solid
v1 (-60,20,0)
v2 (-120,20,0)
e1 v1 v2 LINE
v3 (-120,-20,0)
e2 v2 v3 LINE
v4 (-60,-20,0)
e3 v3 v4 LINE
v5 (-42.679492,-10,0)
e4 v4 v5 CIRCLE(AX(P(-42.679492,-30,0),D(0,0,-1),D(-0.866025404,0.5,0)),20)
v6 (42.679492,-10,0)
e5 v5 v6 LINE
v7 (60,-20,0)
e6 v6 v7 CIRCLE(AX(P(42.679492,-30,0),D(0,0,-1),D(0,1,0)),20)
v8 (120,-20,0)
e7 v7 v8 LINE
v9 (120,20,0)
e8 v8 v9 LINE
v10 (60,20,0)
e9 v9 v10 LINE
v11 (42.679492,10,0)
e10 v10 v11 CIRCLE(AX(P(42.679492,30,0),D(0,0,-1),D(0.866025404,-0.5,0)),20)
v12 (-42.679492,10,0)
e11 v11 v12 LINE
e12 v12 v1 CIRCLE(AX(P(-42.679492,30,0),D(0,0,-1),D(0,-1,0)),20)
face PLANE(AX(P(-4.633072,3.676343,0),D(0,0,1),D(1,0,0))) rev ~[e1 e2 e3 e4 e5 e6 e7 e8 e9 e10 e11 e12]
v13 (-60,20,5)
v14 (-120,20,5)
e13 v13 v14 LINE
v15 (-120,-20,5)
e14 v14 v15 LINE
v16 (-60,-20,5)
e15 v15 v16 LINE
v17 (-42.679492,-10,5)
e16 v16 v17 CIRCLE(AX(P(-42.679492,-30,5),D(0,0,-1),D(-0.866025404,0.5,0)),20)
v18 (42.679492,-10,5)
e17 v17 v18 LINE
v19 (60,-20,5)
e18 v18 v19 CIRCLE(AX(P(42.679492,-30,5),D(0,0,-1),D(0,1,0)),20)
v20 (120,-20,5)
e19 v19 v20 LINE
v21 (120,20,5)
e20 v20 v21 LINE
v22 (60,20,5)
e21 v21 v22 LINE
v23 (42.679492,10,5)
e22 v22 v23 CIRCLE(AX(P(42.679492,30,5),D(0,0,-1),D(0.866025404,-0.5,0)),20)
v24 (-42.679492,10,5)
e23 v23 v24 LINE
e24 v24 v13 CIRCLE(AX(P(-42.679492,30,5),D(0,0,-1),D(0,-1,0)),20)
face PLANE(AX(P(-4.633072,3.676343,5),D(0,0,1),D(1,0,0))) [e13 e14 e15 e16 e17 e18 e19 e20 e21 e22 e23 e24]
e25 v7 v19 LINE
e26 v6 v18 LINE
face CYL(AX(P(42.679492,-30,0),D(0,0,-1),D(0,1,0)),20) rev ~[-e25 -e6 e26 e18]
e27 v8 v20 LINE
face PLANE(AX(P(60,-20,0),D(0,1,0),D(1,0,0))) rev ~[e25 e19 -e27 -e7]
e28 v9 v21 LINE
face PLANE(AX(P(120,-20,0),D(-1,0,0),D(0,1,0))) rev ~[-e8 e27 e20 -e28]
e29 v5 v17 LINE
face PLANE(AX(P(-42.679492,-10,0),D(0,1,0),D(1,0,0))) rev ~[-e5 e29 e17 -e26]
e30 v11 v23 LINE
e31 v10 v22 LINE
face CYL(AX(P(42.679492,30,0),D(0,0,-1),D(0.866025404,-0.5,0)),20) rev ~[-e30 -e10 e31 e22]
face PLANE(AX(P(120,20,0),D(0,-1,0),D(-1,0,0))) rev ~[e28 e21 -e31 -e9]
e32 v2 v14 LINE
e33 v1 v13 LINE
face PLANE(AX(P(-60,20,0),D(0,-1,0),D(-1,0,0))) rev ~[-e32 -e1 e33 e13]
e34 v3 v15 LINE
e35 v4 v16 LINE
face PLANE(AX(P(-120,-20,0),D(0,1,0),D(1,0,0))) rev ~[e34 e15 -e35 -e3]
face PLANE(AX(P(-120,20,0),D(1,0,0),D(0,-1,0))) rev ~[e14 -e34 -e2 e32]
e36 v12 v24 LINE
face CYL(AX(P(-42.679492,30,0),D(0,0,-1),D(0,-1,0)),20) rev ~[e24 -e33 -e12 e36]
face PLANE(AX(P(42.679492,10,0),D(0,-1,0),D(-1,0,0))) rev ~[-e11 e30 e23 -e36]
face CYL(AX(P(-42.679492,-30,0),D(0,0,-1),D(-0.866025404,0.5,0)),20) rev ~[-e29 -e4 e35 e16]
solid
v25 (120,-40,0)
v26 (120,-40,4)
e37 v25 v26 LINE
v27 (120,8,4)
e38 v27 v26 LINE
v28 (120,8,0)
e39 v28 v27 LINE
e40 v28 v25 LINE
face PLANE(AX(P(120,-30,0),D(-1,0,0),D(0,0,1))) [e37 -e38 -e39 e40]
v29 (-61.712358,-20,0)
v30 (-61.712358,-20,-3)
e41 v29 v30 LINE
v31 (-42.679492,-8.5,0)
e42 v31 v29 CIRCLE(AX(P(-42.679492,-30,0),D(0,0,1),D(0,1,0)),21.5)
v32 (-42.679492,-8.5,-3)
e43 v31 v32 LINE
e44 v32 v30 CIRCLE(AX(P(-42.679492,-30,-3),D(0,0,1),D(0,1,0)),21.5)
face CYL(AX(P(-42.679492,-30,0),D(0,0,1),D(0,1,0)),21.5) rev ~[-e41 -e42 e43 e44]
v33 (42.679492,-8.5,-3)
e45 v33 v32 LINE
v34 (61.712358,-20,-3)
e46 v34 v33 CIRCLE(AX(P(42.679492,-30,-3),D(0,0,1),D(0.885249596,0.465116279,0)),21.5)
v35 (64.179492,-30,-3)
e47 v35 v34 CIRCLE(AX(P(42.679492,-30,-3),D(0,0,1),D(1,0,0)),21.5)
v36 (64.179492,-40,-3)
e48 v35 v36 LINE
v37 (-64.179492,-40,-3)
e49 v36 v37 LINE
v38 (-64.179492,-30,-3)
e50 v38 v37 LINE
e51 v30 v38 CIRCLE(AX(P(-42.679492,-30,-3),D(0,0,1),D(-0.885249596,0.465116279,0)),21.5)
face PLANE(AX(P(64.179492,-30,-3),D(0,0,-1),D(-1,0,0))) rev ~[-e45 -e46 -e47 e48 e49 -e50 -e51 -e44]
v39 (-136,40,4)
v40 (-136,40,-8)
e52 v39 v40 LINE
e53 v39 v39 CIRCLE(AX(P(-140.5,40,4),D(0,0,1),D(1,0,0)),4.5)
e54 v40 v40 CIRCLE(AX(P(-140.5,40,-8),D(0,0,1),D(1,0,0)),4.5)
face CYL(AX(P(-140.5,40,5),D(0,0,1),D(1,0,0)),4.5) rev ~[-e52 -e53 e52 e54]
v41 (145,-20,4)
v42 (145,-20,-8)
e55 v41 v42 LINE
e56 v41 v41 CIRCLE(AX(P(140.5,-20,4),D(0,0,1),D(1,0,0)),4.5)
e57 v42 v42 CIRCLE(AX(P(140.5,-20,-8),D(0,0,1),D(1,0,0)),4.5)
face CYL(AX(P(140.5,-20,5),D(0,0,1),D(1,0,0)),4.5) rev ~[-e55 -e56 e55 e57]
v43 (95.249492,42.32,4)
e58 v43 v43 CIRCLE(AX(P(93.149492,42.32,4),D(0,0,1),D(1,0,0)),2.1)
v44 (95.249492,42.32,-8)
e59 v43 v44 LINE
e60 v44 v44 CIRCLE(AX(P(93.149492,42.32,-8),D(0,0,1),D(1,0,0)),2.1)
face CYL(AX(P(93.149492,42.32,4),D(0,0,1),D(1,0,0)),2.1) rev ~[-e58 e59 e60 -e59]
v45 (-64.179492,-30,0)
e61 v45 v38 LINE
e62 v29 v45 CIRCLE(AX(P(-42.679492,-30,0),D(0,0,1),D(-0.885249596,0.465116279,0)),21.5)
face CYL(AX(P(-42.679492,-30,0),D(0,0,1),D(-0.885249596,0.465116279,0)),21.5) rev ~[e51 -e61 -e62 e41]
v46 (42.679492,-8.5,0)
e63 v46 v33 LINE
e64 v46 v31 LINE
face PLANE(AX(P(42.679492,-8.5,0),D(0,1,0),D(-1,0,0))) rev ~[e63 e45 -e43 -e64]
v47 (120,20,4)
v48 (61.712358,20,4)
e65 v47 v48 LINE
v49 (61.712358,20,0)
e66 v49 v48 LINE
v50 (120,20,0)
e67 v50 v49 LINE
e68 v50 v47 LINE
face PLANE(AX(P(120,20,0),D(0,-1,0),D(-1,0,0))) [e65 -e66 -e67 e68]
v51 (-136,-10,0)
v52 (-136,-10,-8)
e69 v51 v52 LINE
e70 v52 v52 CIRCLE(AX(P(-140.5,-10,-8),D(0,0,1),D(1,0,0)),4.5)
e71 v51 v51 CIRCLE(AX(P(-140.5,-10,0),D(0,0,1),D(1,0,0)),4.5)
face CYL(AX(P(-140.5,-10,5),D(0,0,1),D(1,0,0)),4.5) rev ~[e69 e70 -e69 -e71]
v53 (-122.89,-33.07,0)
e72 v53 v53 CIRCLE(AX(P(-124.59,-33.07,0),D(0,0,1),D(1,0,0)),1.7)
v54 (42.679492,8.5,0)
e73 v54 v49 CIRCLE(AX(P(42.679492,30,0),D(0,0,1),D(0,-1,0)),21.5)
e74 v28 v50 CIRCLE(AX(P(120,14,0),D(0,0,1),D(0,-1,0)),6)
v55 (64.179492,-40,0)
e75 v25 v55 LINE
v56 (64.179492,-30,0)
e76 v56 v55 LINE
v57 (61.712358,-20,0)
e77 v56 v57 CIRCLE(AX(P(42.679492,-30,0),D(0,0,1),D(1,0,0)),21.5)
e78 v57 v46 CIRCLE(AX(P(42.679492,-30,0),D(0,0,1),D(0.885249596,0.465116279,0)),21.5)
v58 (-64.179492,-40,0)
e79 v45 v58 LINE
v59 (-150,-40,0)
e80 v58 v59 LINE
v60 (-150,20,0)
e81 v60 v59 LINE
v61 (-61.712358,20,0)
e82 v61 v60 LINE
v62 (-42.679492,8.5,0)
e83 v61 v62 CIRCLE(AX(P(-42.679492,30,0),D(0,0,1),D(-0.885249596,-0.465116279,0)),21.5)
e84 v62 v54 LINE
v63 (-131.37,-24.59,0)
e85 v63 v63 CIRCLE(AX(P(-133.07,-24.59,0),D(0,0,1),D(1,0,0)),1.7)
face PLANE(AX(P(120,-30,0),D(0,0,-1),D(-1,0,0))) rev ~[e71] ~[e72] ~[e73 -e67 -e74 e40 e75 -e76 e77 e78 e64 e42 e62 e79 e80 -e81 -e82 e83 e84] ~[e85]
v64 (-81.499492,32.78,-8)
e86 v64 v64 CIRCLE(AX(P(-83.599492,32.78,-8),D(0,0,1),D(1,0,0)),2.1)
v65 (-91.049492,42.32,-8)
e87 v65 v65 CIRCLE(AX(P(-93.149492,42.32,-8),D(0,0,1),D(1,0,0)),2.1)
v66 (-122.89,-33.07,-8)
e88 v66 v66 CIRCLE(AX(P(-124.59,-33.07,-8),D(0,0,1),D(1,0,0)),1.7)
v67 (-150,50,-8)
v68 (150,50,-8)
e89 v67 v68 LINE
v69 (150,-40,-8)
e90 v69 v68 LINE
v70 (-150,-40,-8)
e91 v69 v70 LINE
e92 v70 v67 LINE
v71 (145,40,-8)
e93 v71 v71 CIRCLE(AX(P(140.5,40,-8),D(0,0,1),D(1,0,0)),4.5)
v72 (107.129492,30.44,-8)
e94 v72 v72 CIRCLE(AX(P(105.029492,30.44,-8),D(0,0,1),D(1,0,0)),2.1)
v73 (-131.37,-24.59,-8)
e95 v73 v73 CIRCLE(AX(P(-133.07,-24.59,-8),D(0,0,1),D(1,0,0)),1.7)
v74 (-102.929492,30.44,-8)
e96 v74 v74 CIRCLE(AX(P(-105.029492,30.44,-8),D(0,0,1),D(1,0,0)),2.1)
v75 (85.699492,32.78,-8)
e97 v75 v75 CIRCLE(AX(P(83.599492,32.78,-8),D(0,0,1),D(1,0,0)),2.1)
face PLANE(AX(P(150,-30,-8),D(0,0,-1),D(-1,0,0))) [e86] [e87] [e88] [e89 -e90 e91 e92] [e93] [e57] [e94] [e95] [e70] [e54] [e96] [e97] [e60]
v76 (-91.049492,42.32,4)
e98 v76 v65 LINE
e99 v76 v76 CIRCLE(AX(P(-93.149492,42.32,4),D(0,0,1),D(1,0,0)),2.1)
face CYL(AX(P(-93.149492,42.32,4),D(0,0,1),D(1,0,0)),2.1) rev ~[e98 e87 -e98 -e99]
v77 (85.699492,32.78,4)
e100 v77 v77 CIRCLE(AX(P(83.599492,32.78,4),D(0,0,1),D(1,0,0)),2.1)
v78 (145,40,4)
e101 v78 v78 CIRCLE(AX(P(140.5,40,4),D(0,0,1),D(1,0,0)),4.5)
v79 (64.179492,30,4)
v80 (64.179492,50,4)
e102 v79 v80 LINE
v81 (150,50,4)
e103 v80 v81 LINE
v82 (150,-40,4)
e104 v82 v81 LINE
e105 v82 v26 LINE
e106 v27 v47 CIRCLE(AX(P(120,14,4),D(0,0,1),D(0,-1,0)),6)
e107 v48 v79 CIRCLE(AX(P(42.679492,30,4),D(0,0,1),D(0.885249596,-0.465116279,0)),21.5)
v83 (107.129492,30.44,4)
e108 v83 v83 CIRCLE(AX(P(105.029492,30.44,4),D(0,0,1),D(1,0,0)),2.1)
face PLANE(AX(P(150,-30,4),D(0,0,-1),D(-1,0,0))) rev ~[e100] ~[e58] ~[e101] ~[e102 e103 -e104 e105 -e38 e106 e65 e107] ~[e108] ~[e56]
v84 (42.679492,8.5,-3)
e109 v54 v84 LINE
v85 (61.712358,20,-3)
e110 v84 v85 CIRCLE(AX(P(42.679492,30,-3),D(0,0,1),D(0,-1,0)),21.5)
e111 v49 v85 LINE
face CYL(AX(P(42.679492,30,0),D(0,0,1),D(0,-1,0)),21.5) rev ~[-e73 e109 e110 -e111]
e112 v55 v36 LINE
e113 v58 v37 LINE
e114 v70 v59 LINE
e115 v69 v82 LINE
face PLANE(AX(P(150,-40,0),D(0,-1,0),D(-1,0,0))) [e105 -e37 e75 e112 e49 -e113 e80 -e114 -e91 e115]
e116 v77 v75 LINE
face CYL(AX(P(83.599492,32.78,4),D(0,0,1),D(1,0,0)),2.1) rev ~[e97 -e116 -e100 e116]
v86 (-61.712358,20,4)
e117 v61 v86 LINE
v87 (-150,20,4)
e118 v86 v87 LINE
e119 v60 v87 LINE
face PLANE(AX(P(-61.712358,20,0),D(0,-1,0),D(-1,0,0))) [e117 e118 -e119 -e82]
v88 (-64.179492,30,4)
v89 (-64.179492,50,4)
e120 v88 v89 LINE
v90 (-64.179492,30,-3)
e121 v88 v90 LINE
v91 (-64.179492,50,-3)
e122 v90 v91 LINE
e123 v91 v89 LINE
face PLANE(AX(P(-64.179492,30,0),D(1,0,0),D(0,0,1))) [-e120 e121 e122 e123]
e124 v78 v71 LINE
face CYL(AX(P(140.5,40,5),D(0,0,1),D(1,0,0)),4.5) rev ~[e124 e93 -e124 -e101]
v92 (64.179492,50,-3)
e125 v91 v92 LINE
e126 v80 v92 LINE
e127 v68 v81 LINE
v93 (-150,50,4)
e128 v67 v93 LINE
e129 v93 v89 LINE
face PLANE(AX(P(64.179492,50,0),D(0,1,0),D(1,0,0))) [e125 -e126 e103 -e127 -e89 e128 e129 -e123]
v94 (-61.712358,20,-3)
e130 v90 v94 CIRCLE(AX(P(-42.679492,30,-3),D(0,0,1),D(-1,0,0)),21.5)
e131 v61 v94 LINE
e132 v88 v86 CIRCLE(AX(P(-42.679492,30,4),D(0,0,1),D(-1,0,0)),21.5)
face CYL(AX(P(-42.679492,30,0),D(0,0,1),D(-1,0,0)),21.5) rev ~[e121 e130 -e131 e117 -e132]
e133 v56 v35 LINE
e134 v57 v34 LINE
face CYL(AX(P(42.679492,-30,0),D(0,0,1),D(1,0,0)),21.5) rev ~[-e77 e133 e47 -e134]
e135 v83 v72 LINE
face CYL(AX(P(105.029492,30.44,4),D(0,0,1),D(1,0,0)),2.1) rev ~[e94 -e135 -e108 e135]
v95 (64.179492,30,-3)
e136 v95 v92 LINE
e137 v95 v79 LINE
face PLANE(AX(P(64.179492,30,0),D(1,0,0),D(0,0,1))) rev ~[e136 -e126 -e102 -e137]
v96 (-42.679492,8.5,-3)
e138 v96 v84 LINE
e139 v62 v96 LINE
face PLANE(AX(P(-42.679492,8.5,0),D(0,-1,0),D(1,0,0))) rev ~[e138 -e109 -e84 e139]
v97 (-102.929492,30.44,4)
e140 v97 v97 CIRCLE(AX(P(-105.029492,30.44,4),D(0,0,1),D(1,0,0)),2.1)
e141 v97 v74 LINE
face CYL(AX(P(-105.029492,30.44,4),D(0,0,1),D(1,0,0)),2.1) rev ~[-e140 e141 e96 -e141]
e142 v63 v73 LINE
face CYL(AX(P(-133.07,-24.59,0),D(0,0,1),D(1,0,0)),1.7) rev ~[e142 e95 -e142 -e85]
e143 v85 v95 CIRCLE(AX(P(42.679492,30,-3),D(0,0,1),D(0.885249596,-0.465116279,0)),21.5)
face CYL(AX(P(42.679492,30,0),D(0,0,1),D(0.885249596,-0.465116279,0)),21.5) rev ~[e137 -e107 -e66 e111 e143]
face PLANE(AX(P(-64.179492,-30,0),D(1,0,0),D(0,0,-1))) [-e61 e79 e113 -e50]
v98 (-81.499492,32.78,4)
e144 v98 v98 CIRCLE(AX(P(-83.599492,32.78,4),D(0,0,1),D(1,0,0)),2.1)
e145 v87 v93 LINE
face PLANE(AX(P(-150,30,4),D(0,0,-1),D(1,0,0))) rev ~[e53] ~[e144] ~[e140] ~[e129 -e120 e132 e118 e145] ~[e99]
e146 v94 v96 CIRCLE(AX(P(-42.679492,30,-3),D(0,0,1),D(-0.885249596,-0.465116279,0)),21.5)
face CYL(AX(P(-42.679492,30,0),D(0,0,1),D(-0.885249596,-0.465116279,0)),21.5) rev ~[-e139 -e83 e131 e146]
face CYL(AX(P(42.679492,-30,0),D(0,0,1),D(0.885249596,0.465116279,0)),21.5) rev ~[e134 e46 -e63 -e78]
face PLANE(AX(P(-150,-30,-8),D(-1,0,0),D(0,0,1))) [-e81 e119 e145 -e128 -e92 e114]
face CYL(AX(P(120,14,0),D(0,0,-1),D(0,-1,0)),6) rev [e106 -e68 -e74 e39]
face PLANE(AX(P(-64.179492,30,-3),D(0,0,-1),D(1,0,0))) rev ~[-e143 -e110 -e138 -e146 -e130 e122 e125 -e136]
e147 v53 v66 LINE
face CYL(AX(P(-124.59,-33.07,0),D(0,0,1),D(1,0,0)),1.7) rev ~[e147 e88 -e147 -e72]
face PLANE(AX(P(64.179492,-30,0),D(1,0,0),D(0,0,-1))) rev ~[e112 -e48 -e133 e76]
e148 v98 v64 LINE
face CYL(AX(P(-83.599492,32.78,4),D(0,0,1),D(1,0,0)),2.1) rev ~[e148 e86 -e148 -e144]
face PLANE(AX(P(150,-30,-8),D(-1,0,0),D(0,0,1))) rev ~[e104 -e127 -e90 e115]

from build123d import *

# Parameters (mm, degrees)
F1_DEPTH  = 5
F3_DEPTH  = 3
F4_W      = 20
F4_H      = 60
F5_DEPTH  = 5
F6_DEPTH  = 4
F7_DEPTH  = 20
F8_R      = 2.1
F9_DEPTH  = 25
F10_R     = 4.5
F11_DEPTH = 25
F13_DEPTH = 10
F12_R     = 1.7
F14_DEPTH = 25


# Not quite as in the source:
# - a feature names something its author has since deleted; it is built from what else it names


with BuildPart() as f1:
    # F0 (on Top) → F1 (new body)
    with BuildSketch(Plane.XY):
        with BuildLine():
            Line((0, -10), (0, 0))
            Line((0, 0), (120, 0))
            Line((120, 0), (120, 20))
            Line((120, 20), (60, 20))
            ThreePointArc((60, 20), (52.6794919243, 12.6794919243), (42.6794919243, 10))
            Line((42.6794919243, 10), (0, 10))
            Line((0, 10), (-42.6794919243, 10))
            ThreePointArc((-42.6794919243, 10), (-52.6794919243, 12.6794919243), (-60, 20))
            Line((-60, 20), (-120, 20))
            Line((-120, 20), (-120, 0))
            Line((-120, 0), (-120, -20))
            Line((-120, -20), (-60, -20))
            ThreePointArc((-60, -20), (-52.6794919243, -12.6794919243), (-42.6794919243, -10))
            Line((-42.6794919243, -10), (0, -10))
        make_face()
        with BuildLine():
            Line((120, 0), (0, 0))
            Line((0, 0), (0, -10))
            Line((0, -10), (42.6794919243, -10))
            ThreePointArc((42.6794919243, -10), (52.6794919243, -12.6794919243), (60, -20))
            Line((60, -20), (120, -20))
            Line((120, -20), (120, 0))
        make_face()
    extrude(amount=F1_DEPTH)


with BuildPart() as f3:
    # F2 (on face) → F3 (new body)
    with BuildSketch(Plane(origin=(0, 0, 0), x_dir=(1, 0, 0), z_dir=(0, 0, -1))):
        with BuildLine():
            Line((120, 30), (64.1794919243, 30))
            ThreePointArc((64.1794919243, 30), (63.5535982007, 24.8500789171), (61.712358235, 20))
            Line((61.712358235, 20), (120, 20))
            Line((120, 20), (120, 30))
        make_face()
        with BuildLine():
            Line((120, 20), (61.712358235, 20))
            ThreePointArc((61.712358235, 20), (53.7981699033, 11.5982337804), (42.6794919243, 8.5))
            Line((42.6794919243, 8.5), (-42.6794919243, 8.5))
            ThreePointArc((-42.6794919243, 8.5), (-53.7981699033, 11.5982337804), (-61.712358235, 20))
            Line((-61.712358235, 20), (-120, 20))
            Line((-120, 20), (-120, -20))
            Line((-120, -20), (-61.712358235, -20))
            ThreePointArc((-61.712358235, -20), (-53.7981699033, -11.5982337804), (-42.6794919243, -8.5))
            Line((-42.6794919243, -8.5), (42.6794919243, -8.5))
            ThreePointArc((42.6794919243, -8.5), (53.7981699033, -11.5982337804), (61.712358235, -20))
            Line((61.712358235, -20), (120, -20))
            Line((120, -20), (120, -8))
            Line((120, -8), (120, 20))
        make_face()
        with BuildLine():
            ThreePointArc((-61.712358235, 20), (-63.5535982007, 24.8500789171), (-64.1794919243, 30))
            Line((-64.1794919243, 30), (-150, 30))
            Line((-150, 30), (-150, -20))
            Line((-150, -20), (-120, -20))
            Line((-120, -20), (-120, 20))
            Line((-120, 20), (-61.712358235, 20))
        make_face()
        with BuildLine():
            Line((-120, -20), (-150, -20))
            Line((-150, -20), (-150, -30))
            Line((-150, -30), (-64.1794919243, -30))
            ThreePointArc((-64.1794919243, -30), (-63.5535982007, -24.8500789171), (-61.712358235, -20))
            Line((-61.712358235, -20), (-120, -20))
        make_face()
        with BuildLine():
            Line((150, 30), (120, 30))
            Line((120, 30), (120, 20))
            Line((120, 20), (120, -8))
            ThreePointArc((120, -8), (126, -14), (120, -20))
            Line((120, -20), (61.712358235, -20))
            ThreePointArc((61.712358235, -20), (63.5535982007, -24.8500789171), (64.1794919243, -30))
            Line((64.1794919243, -30), (150, -30))
            Line((150, -30), (150, 30))
        make_face()
        with BuildLine():
            ThreePointArc((120, -20), (126, -14), (120, -8))
            Line((120, -8), (120, -20))
        make_face()
    extrude(amount=F3_DEPTH)

    # F4 (on face) → F5 (join)
    with BuildSketch(Plane(origin=(0, 0, -3), x_dir=(1, 0, 0), z_dir=(0, 0, -1))):
        with BuildLine():
            Line((64.1794919243, -30), (130, -30))
            Line((130, -30), (130, 30))
            Line((130, 30), (64.1794919243, 30))
            ThreePointArc((64.1794919243, 30), (57.8822877198, 14.7972042045), (42.6794919243, 8.5))
            Line((42.6794919243, 8.5), (-42.6794919243, 8.5))
            ThreePointArc((-42.6794919243, 8.5), (-57.8822877198, 14.7972042045), (-64.1794919243, 30))
            Line((-64.1794919243, 30), (-130, 30))
            Line((-130, 30), (-130, -30))
            Line((-130, -30), (-64.1794919243, -30))
            ThreePointArc((-64.1794919243, -30), (-57.8822877198, -14.7972042045), (-42.6794919243, -8.5))
            Line((-42.6794919243, -8.5), (42.6794919243, -8.5))
            ThreePointArc((42.6794919243, -8.5), (57.8822877198, -14.7972042045), (64.1794919243, -30))
        make_face()
        with BuildLine():
            ThreePointArc((42.6794919243, 8.5), (57.8822877198, 14.7972042045), (64.1794919243, 30))
            Line((64.1794919243, 30), (-64.1794919243, 30))
            ThreePointArc((-64.1794919243, 30), (-57.8822877198, 14.7972042045), (-42.6794919243, 8.5))
            Line((-42.6794919243, 8.5), (42.6794919243, 8.5))
        make_face()
        with BuildLine():
            Line((-64.1794919243, -30), (64.1794919243, -30))
            ThreePointArc((64.1794919243, -30), (57.8822877198, -14.7972042045), (42.6794919243, -8.5))
            Line((42.6794919243, -8.5), (-42.6794919243, -8.5))
            ThreePointArc((-42.6794919243, -8.5), (-57.8822877198, -14.7972042045), (-64.1794919243, -30))
        make_face()
        with Locations((-140, 0)):
            Rectangle(F4_W, F4_H)
        with Locations((140, 0)):
            Rectangle(F4_W, F4_H)
    extrude(amount=F5_DEPTH)

    # F2 (on face) → F6 (join)
    with BuildSketch(Plane(origin=(0, 0, 0), x_dir=(1, 0, 0), z_dir=(0, 0, -1))):
        with BuildLine():
            Line((150, 30), (120, 30))
            Line((120, 30), (120, 20))
            Line((120, 20), (120, -8))
            ThreePointArc((120, -8), (126, -14), (120, -20))
            Line((120, -20), (61.712358235, -20))
            ThreePointArc((61.712358235, -20), (63.5535982007, -24.8500789171), (64.1794919243, -30))
            Line((64.1794919243, -30), (150, -30))
            Line((150, -30), (150, 30))
        make_face()
        with BuildLine():
            Line((-120, -20), (-150, -20))
            Line((-150, -20), (-150, -30))
            Line((-150, -30), (-64.1794919243, -30))
            ThreePointArc((-64.1794919243, -30), (-63.5535982007, -24.8500789171), (-61.712358235, -20))
            Line((-61.712358235, -20), (-120, -20))
        make_face()
    extrude(amount=-F6_DEPTH)

    # F7 (add): a face of the model
    f7_faces = [f3.faces().sort_by_distance(p)[0] for p in [
        (67.1818909651, 30, 0.5),
    ]]
    extrude(f7_faces, amount=F7_DEPTH)

    # F8 (on face) → F9 (cut)
    with BuildSketch(Plane.XY.offset(4)):
        with Locations((-105.0294919243, 30.44)):
            Circle(F8_R)
        with Locations((-93.1494919243, 42.32)):
            Circle(F8_R)
        with Locations((-83.5994919243, 32.78)):
            Circle(F8_R)
        with Locations((83.5994919243, 32.78)):
            Circle(F8_R)
        with Locations((93.1494919243, 42.32)):
            Circle(F8_R)
        with Locations((105.0294919243, 30.44)):
            Circle(F8_R)
    extrude(amount=-F9_DEPTH, mode=Mode.SUBTRACT)

    # F10 (on face) → F11 (cut)
    with BuildSketch(Plane.XY.offset(5)):
        with Locations((-140.5, -10)):
            Circle(F10_R)
        with Locations((140.5, -20)):
            Circle(F10_R)
        with Locations((-140.5, 40)):
            Circle(F10_R)
        with Locations((140.5, 40)):
            Circle(F10_R)
    extrude(amount=-F11_DEPTH, mode=Mode.SUBTRACT)

    # F13 (add): a face of the model
    f13_faces = [f3.faces().sort_by_distance(p)[0] for p in [
        (7.5880955109, -30, -4.1136773426),
    ]]
    extrude(f13_faces, amount=F13_DEPTH)

    # F12 (on face) → F14 (cut)
    with BuildSketch(Plane.XY):
        with Locations((-124.59, -33.07)):
            Circle(F12_R)
        with Locations((-133.07, -24.59)):
            Circle(F12_R)
    extrude(amount=-F14_DEPTH, mode=Mode.SUBTRACT)


solid = Compound([f1.part, f3.part])
